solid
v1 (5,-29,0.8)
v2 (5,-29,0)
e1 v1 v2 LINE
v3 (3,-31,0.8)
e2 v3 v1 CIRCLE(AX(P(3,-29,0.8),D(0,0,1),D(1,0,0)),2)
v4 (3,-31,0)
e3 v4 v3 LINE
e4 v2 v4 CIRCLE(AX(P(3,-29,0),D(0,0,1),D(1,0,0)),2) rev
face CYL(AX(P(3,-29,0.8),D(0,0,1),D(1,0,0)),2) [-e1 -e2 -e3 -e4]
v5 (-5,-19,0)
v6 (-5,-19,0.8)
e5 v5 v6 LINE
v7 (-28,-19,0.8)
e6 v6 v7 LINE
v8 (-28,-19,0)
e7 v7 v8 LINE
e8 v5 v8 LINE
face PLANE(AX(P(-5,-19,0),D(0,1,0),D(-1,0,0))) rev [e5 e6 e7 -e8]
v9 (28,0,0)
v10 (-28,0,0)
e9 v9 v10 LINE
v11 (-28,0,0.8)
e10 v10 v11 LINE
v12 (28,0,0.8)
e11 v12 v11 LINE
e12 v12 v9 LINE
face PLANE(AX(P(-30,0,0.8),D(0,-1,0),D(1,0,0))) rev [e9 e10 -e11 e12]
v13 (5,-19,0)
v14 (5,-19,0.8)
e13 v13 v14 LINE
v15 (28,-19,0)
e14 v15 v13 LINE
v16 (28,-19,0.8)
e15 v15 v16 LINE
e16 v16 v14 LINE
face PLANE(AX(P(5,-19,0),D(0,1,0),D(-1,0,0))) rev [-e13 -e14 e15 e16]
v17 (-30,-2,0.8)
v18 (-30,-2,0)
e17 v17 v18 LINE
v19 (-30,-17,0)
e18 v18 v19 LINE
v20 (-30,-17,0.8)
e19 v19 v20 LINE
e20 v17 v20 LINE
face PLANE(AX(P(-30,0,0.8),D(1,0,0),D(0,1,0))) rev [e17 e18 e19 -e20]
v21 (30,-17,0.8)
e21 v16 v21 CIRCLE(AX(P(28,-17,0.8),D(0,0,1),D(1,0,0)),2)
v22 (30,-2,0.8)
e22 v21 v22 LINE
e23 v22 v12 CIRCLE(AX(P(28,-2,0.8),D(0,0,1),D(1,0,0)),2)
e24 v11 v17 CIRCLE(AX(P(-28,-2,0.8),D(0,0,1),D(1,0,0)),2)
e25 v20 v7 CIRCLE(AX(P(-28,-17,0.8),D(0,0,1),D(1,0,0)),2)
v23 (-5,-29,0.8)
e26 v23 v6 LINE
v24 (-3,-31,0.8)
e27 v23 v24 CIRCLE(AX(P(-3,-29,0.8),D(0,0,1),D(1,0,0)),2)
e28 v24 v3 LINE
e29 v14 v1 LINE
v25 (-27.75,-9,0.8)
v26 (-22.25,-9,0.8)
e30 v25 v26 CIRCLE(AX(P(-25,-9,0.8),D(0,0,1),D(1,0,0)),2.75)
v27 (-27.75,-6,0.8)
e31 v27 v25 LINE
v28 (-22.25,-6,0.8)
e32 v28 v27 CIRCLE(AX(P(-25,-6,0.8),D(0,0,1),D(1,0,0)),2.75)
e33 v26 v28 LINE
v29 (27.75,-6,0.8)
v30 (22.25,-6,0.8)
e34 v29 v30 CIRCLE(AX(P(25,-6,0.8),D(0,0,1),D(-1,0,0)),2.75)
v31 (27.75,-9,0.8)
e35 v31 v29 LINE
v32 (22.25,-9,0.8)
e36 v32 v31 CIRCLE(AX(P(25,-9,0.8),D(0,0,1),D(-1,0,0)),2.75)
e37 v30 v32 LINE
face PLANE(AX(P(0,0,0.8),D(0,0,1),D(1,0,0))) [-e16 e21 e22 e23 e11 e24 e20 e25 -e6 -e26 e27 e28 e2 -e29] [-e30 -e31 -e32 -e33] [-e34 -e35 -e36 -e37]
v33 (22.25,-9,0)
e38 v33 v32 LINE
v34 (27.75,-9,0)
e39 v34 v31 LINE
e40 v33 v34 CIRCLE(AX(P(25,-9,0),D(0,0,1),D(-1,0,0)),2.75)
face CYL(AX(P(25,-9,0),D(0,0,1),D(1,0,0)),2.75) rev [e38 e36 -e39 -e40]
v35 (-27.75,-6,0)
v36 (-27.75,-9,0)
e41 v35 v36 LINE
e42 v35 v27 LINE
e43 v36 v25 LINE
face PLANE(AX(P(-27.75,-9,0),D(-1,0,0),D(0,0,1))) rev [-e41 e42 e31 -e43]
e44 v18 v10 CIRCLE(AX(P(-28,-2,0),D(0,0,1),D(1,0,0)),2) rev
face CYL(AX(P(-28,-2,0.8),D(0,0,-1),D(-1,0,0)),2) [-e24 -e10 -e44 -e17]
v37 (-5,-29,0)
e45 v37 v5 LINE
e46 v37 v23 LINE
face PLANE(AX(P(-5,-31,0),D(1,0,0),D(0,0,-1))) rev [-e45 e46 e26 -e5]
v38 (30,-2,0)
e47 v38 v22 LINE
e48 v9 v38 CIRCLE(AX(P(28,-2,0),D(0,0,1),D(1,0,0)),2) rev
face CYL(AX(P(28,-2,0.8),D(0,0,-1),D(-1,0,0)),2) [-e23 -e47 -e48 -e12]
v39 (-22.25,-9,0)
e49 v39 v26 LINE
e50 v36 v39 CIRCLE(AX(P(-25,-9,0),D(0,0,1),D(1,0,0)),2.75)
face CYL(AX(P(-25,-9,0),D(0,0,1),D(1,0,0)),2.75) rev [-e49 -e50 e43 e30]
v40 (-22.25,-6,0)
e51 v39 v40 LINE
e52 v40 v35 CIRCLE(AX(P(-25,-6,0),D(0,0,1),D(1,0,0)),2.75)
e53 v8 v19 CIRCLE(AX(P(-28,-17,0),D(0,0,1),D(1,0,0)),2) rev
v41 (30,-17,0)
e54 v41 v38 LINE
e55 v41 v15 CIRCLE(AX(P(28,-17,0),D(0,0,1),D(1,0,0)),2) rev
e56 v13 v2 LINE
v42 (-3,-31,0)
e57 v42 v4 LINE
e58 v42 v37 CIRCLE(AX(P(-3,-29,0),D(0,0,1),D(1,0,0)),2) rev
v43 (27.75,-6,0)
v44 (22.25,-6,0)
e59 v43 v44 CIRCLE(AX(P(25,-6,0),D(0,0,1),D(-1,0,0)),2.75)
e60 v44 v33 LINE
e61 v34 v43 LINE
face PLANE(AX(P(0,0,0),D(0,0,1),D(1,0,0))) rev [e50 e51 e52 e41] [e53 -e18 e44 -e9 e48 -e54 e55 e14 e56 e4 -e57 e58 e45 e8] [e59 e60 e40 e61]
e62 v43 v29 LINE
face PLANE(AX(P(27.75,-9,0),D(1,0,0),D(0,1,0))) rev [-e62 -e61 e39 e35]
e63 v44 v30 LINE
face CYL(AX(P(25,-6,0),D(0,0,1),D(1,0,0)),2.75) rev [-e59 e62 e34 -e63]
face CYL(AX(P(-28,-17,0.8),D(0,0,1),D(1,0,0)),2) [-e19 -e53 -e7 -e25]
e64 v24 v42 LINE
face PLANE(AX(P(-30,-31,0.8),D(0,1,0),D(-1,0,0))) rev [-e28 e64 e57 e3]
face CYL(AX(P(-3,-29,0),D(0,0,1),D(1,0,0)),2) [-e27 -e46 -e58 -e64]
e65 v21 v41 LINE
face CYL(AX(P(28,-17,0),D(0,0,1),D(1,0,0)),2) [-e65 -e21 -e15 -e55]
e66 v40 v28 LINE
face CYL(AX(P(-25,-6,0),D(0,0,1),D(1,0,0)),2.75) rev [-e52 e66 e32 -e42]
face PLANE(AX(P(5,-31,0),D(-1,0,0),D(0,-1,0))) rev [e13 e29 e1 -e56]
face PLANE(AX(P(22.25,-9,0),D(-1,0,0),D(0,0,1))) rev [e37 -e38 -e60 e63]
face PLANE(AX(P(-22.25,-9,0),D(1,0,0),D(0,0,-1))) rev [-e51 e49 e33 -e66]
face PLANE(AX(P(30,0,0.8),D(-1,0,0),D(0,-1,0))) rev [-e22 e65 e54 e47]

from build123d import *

# Parameters (mm, degrees)
SKETCH_1_W             = 60
SKETCH_1_H             = 31
SM_BASE_FLANGE_1_DEPTH = 0.8
CUT_EXTRUDE_2_DEPTH    = 44.146726411
SKETCH_14_W            = 25
SKETCH_14_H            = 12
CUT_EXTRUDE_3_DEPTH    = 44.146726411
FILLET_3_R             = 2


# Sheet-metal steps are written as plain solids
with BuildPart() as part:
    # Sketch 1 → 基体-法兰1 (new body)
    with BuildSketch(Plane.XY):
        with Locations((0, -15.5)):
            Rectangle(SKETCH_1_W, SKETCH_1_H)
    extrude(amount=SM_BASE_FLANGE_1_DEPTH)

    # 草图13 → 切除-拉伸2 (cut, through all)
    with BuildSketch(Plane.XY.offset(0.8)):
        with BuildLine():
            Line((-27.75, -9), (-27.75, -6))
            ThreePointArc((-27.75, -6), (-25, -3.25), (-22.25, -6))
            Line((-22.25, -6), (-22.25, -9))
            ThreePointArc((-22.25, -9), (-25, -11.75), (-27.75, -9))
        make_face()
        with BuildLine():
            Line((27.75, -9), (27.75, -6))
            ThreePointArc((27.75, -6), (25, -3.25), (22.25, -6))
            Line((22.25, -6), (22.25, -9))
            ThreePointArc((22.25, -9), (25, -11.75), (27.75, -9))
        make_face()
    extrude(amount=-CUT_EXTRUDE_2_DEPTH, mode=Mode.SUBTRACT)

    # 草图14 → 切除-拉伸3 (cut, through all)
    with BuildSketch(Plane.XY.offset(0.8)):
        with Locations((-17.5, -25)):
            Rectangle(SKETCH_14_W, SKETCH_14_H)
        with Locations((17.5, -25)):
            Rectangle(SKETCH_14_W, SKETCH_14_H)
    extrude(amount=-CUT_EXTRUDE_3_DEPTH, mode=Mode.SUBTRACT)

    # 圆角3
    fillet_3_edges = [part.edges().sort_by_distance(p)[0] for p in [
        (-5, -31, 0.4),
        (-30, -19, 0.4),
        (5, -31, 0.4),
        (30, -19, 0.4),
        (-30, 0, 0.4),
        (30, 0, 0.4),
    ]]
    fillet(fillet_3_edges, radius=FILLET_3_R)


solid = part.part
